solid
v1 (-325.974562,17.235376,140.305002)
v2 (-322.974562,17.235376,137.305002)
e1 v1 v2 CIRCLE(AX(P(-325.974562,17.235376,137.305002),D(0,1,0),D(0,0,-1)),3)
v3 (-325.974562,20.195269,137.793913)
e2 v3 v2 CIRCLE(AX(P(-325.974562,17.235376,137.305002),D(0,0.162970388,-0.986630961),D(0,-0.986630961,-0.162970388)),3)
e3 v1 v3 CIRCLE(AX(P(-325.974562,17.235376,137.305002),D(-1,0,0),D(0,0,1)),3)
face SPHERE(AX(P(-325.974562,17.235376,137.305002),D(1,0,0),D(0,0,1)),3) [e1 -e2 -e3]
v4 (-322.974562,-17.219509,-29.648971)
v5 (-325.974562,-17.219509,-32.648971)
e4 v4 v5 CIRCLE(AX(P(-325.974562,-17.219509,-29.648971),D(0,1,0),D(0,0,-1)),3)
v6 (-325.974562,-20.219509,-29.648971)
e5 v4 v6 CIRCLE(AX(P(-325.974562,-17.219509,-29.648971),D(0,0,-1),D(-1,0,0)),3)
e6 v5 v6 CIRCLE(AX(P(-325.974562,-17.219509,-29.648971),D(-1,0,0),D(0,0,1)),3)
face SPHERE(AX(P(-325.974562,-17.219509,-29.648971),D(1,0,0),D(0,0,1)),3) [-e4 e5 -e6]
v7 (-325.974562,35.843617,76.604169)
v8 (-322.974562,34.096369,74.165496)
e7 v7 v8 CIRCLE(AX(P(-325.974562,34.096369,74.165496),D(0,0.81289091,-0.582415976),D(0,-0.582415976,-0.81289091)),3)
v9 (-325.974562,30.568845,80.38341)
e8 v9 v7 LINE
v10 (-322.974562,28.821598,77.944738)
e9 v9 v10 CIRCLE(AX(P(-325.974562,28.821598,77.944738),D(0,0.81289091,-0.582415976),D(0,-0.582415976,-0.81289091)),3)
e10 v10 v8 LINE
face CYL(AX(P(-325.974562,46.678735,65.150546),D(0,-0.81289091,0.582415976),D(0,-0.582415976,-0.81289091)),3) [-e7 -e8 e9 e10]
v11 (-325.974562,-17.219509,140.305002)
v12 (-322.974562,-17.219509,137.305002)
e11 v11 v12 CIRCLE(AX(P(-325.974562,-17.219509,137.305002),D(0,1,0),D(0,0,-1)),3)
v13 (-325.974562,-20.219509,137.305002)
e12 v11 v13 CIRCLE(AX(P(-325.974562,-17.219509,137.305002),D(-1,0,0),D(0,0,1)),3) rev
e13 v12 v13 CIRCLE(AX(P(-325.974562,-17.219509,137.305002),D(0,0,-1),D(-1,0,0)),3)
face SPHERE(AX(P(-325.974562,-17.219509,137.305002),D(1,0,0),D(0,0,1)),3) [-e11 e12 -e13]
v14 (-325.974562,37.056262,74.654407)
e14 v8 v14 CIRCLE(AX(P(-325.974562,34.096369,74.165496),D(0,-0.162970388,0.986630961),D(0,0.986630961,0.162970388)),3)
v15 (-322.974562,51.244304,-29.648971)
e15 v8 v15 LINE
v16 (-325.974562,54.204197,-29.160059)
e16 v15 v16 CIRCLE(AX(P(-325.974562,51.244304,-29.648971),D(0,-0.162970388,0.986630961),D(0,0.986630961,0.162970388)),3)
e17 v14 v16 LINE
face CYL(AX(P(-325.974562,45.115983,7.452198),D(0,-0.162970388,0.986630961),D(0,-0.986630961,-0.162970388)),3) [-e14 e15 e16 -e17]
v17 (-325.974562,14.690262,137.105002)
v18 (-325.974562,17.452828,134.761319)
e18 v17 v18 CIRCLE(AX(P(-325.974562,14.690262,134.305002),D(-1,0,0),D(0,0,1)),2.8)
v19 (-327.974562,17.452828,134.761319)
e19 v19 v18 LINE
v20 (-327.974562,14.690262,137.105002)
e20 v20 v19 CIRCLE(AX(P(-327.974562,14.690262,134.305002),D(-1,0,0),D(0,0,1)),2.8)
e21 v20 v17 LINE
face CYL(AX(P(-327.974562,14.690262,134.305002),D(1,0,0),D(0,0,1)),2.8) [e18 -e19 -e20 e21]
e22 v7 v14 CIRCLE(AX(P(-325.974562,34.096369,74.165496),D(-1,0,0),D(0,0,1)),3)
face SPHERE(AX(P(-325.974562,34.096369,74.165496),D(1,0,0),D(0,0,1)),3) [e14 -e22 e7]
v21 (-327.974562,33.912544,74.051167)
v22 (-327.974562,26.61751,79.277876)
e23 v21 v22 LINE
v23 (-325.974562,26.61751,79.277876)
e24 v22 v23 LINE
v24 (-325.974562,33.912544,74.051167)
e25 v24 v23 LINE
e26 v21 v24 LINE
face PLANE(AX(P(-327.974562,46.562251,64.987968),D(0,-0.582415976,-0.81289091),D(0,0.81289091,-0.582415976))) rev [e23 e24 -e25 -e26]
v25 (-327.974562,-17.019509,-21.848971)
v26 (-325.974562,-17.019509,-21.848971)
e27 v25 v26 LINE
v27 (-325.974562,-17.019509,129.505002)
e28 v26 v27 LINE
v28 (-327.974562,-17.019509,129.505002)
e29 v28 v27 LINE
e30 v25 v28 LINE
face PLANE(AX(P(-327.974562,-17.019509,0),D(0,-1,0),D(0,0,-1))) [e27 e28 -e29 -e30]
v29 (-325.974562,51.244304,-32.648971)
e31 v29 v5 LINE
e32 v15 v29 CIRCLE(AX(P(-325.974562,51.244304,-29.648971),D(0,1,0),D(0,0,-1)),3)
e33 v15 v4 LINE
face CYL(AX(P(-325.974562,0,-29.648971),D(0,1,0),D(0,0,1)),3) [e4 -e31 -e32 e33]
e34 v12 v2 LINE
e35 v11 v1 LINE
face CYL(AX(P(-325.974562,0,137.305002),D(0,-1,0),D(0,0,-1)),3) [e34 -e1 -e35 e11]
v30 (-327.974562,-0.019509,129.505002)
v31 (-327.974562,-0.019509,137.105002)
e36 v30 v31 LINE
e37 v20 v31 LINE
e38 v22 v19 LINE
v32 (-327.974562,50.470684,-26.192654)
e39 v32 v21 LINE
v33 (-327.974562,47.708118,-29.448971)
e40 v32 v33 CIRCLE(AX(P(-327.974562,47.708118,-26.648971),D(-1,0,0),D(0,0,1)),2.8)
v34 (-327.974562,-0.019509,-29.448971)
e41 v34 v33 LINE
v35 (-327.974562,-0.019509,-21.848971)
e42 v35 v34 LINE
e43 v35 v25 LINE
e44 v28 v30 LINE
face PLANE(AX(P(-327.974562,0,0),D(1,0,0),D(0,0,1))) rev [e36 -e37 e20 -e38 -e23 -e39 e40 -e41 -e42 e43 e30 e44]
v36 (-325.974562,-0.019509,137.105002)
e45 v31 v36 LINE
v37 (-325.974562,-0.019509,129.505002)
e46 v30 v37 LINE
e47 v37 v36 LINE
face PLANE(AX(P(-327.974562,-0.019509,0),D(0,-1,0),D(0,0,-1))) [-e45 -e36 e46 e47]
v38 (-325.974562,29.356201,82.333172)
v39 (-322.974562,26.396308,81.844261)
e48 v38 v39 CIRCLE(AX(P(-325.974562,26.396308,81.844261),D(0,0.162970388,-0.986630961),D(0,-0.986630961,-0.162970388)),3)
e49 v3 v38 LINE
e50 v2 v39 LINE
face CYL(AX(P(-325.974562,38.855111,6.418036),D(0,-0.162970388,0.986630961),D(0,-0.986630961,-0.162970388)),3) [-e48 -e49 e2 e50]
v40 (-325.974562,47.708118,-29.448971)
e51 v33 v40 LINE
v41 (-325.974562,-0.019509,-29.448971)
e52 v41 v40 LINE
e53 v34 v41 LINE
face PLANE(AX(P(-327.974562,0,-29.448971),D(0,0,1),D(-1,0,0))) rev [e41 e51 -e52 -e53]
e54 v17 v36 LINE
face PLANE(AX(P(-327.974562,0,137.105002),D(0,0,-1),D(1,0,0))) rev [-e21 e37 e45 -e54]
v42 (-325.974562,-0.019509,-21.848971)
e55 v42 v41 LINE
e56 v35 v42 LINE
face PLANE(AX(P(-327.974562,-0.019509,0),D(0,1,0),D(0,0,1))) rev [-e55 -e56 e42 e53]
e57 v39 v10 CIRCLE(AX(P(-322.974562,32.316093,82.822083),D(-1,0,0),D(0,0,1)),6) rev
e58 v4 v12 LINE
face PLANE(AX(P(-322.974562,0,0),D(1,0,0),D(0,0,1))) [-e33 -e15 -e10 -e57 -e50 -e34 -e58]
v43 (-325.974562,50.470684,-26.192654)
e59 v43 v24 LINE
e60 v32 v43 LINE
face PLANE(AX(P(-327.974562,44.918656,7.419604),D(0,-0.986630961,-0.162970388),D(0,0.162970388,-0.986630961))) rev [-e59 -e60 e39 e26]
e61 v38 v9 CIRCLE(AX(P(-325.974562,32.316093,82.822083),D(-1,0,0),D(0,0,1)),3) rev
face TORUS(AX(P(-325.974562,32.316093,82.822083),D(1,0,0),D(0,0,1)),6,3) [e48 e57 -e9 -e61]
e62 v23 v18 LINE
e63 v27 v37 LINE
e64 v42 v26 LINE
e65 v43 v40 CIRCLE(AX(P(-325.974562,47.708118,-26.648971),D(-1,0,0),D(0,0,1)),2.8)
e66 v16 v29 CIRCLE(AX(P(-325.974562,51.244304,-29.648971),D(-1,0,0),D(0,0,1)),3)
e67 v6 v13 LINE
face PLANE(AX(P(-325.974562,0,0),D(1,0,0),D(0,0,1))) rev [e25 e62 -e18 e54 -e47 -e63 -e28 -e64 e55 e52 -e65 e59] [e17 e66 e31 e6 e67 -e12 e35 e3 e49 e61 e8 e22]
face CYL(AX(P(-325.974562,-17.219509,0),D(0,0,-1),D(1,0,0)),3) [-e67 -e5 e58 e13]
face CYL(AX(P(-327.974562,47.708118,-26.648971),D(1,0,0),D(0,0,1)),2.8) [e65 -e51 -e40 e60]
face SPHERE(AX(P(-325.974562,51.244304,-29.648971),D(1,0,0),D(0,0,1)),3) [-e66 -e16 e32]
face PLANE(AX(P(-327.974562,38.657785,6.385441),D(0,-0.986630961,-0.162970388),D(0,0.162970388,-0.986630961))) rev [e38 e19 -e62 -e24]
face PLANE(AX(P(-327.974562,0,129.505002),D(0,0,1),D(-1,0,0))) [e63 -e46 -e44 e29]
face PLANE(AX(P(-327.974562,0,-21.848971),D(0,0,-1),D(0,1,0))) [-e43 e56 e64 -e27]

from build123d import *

# Parameters (mm, degrees)
BOSS_EXTRUDE1_DEPTH = 2
BOSS_EXTRUDE2_DEPTH = 3
FILLET1_R           = 3


with BuildPart() as part:
    # Sketch1 → Boss-Extrude1 (new body)
    with BuildSketch(Plane.ZY.offset(329.974562358)):
        with BuildLine():
            Line((137.105001839, 14.690261729), (137.105001839, -0.019509128))
            Line((137.105001839, -0.019509128), (133.705001839, -0.019509128))
            Line((133.705001839, -0.019509128), (129.505001839, -0.019509128))
            Line((129.505001839, -0.019509128), (129.505001839, -17.019509128))
            Line((129.505001839, -17.019509128), (-21.848970599, -17.019509128))
            Line((-21.848970599, -17.019509128), (-21.848970599, -0.019509128))
            Line((-21.848970599, -0.019509128), (-26.048970599, -0.019509128))
            Line((-26.048970599, -0.019509128), (-29.448970599, -0.019509128))
            Line((-29.448970599, -0.019509128), (-29.448970599, 47.708117707))
            ThreePointArc((-29.448970599, 47.708117707), (-28.460366767, 49.843262649), (-26.192653512, 50.470684397))
            Line((-26.192653512, 50.470684397), (74.05116687, 33.912543624))
            Line((74.05116687, 33.912543624), (79.277875997, 26.617509644))
            Line((79.277875997, 26.617509644), (134.761318926, 17.452828418))
            ThreePointArc((134.761318926, 17.452828418), (136.440146781, 16.501657897), (137.105001839, 14.690261729))
        make_face()
    extrude(amount=-BOSS_EXTRUDE1_DEPTH)

    # Sketch1<4> → Boss-Extrude2 (add)
    with BuildSketch(Plane.ZY.offset(329.974562358)):
        with BuildLine():
            Line((140.305001839, -17.219509128), (140.305001839, 17.2353763))
            ThreePointArc((140.305001839, 17.2353763), (139.592657134, 19.176157909), (137.793913004, 20.195269182))
            Line((137.793913004, 20.195269182), (82.333171975, 29.356200538))
            ThreePointArc((82.333171975, 29.356200538), (81.237686153, 29.768607171), (80.383410411, 30.568845492))
            Line((80.383410411, 30.568845492), (76.604168861, 35.843616835))
            ThreePointArc((76.604168861, 35.843616835), (75.749893119, 36.643855156), (74.654407298, 37.056261789))
            Line((74.654407298, 37.056261789), (-29.160059434, 54.204197172))
            ThreePointArc((-29.160059434, 54.204197172), (-31.589752208, 53.531959584), (-32.648970599, 51.24430429))
            Line((-32.648970599, 51.24430429), (-32.648970599, -17.219509128))
            ThreePointArc((-32.648970599, -17.219509128), (-31.770290943, -19.340829471), (-29.648970599, -20.219509128))
            Line((-29.648970599, -20.219509128), (137.305001839, -20.219509128))
            ThreePointArc((137.305001839, -20.219509128), (139.426322182, -19.340829471), (140.305001839, -17.219509128))
        make_face()
    extrude(amount=BOSS_EXTRUDE2_DEPTH)

    # Fillet1
    fillet1_edges = [part.edges().sort_by_distance(p)[0] for p in [
        (-332.974562358, 17.012397581, -32.648970599),
        (-332.974562358, 53.531959584, -31.589752208),
        (-332.974562358, 45.63022948, 22.747173932),
        (-332.974562358, 36.643855156, 75.749893119),
        (-332.974562358, 33.206231163, 78.493789636),
        (-332.974562358, 29.768607171, 81.237686153),
        (-332.974562358, 24.77573486, 110.063542489),
        (-332.974562358, 19.176157909, 139.592657134),
        (-332.974562358, 0.007933586, 140.305001839),
        (-332.974562358, -19.340829471, 139.426322182),
        (-332.974562358, -20.219509128, 53.82801562),
        (-332.974562358, -19.340829471, -31.770290943),
    ]]
    fillet(fillet1_edges, radius=FILLET1_R - 0.0001)  # a hair under: the kernel refuses the full size


with BuildPart() as body_2:
    # Mirror1: mirrored copy
    add(part.part.mirror(Plane.ZY.offset(327.974562358)))


solid = body_2.part
